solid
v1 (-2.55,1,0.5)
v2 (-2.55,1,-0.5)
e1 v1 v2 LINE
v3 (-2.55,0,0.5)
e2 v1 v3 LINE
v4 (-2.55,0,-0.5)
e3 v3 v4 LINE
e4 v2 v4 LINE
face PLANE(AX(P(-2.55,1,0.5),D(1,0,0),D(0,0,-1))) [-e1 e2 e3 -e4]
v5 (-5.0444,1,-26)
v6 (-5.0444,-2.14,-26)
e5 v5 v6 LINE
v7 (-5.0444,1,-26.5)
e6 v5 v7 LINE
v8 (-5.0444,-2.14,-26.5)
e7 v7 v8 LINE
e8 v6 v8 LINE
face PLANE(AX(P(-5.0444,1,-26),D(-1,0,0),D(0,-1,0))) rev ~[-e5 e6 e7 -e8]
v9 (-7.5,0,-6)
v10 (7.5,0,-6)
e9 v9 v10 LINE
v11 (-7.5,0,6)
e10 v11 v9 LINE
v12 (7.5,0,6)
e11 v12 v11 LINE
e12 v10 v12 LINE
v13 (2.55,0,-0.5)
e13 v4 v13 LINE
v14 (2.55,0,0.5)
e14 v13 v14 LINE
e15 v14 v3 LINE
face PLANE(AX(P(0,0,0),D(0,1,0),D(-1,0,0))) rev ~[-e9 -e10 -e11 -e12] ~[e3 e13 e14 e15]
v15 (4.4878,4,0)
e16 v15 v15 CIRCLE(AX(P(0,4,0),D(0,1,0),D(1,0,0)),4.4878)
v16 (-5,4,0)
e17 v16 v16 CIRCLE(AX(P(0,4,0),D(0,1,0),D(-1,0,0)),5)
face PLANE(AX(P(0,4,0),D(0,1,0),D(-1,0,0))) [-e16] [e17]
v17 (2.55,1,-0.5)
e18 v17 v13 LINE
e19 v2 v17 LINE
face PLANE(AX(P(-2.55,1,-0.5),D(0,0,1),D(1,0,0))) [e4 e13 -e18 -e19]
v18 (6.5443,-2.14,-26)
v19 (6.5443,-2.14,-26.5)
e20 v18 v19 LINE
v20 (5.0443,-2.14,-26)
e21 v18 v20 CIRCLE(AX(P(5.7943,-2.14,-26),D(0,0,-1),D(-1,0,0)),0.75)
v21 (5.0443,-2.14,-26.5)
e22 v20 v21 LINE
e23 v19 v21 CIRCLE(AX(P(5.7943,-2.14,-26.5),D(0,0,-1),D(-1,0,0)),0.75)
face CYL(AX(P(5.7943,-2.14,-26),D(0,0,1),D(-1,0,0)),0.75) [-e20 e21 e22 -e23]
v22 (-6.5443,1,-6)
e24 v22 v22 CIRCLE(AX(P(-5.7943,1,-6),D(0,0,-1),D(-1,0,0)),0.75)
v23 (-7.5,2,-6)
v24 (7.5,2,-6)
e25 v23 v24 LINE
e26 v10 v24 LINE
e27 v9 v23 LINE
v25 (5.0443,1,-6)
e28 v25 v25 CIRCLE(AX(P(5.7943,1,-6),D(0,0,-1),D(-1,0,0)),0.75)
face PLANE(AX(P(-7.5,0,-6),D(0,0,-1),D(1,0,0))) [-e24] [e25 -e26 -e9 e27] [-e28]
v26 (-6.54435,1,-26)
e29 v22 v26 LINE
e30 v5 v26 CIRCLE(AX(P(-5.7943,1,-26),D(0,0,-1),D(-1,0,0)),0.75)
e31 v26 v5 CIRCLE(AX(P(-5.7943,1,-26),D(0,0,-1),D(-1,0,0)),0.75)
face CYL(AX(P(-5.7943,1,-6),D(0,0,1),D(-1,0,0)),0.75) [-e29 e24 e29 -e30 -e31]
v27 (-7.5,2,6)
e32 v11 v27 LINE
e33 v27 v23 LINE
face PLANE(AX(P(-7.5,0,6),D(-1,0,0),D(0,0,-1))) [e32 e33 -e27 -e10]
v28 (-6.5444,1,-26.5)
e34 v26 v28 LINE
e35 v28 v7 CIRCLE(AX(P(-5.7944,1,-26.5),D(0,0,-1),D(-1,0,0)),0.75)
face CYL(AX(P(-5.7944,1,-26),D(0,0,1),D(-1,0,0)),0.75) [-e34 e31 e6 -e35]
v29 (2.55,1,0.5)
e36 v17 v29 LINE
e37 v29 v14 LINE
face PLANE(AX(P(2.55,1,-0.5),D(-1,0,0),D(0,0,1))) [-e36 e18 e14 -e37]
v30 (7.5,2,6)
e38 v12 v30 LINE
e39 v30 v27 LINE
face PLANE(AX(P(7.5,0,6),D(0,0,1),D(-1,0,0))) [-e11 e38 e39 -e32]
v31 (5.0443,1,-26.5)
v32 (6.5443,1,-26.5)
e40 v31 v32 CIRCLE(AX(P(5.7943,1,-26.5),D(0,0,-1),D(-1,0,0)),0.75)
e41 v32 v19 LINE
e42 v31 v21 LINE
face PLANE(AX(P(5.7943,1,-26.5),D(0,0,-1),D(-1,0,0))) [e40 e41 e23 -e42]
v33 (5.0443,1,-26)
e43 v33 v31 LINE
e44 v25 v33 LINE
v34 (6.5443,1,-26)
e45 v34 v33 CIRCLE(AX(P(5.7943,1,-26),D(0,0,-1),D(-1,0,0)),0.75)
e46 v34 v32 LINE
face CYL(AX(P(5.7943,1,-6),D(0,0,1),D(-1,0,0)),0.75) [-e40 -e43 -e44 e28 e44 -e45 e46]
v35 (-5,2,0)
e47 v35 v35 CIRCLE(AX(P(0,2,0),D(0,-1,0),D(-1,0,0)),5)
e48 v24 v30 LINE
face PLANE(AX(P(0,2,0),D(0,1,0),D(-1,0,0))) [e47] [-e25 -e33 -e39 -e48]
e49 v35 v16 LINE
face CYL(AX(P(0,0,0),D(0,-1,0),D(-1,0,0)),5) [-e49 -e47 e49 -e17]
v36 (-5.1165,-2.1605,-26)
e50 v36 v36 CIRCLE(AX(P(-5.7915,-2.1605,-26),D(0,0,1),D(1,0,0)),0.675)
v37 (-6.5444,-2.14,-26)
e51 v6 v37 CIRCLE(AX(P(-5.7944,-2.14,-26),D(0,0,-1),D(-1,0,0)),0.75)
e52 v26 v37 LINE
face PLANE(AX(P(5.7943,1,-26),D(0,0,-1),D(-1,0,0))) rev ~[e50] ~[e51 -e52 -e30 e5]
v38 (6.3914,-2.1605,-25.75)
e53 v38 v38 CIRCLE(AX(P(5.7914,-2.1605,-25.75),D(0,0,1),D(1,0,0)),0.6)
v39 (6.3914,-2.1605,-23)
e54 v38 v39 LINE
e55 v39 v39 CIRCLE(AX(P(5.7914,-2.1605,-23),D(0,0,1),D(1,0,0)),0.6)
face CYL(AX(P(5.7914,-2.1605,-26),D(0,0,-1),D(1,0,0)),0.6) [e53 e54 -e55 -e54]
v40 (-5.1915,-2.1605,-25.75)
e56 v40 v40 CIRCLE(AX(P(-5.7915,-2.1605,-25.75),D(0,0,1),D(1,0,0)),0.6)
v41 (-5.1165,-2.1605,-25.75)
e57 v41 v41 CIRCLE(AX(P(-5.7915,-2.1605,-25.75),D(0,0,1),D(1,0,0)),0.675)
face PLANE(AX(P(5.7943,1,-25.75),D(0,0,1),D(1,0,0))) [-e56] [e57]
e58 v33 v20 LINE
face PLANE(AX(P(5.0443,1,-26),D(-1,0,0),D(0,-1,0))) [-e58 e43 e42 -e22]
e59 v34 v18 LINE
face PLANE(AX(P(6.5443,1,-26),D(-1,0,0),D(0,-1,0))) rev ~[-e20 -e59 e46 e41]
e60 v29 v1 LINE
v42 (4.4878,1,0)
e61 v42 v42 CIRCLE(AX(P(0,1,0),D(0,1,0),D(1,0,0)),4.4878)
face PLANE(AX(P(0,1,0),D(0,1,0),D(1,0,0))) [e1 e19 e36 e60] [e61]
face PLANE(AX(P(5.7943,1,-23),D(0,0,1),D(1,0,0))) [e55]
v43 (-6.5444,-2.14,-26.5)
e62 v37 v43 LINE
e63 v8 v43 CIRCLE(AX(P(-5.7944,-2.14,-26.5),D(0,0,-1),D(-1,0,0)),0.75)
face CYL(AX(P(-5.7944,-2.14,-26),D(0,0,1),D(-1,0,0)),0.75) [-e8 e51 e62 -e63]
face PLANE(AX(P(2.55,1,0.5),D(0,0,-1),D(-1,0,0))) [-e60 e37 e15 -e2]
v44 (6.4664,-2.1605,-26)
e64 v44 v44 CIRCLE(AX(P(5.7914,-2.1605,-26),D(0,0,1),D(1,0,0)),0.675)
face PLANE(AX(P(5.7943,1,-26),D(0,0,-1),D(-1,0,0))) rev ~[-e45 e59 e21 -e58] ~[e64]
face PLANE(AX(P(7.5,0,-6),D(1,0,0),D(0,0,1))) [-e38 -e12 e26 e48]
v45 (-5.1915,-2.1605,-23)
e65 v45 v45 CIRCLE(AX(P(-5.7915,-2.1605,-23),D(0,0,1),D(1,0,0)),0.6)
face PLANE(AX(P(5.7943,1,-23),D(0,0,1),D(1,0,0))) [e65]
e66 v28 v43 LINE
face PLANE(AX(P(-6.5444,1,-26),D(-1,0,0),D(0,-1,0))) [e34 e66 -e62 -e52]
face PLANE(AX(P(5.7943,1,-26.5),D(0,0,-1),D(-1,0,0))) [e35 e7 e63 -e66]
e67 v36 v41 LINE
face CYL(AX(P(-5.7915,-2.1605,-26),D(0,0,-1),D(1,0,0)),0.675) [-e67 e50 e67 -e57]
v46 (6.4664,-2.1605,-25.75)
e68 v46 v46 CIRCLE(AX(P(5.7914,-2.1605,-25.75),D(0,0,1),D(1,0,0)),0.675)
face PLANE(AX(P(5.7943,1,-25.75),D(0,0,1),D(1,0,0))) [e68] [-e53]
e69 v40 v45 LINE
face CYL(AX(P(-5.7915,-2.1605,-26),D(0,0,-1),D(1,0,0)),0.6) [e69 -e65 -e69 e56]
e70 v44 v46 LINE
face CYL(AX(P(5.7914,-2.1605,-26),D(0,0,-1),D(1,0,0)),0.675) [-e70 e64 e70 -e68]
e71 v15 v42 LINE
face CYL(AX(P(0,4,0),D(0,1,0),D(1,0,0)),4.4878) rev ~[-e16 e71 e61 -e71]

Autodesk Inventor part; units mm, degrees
ref_plane "YZ Plane" through (0, 0, 0) normal (1, 0, 0) x (0, 1, 0)
ref_plane "XZ Plane" through (0, 0, 0) normal (0, 1, 0) x (-1, 0, 0)
ref_plane "XY Plane" through (0, 0, 0) normal (0, 0, 1) x (1, 0, 0)
sketch "Sketch1" plane through (0, 0, 0) normal (0, 1, 0) x (-1, 0, 0)
  line L0 (2.55, 0.5) -> (-2.55, 0.5)
  line L1 (-2.55, 0.5) -> (-2.55, -0.5)
  line L2 (-2.55, -0.5) -> (2.55, -0.5)
  line L3 (2.55, -0.5) -> (2.55, 0.5)
  line L4 (-2.55, 0) -> (2.55, 0) construction
  point P0 (0, 0)
  point P1 (0, -0.5)
  point P2 (0, 0)
  dimension "d0" = 5.1
  dimension "d1" = 1
sketch "Sketch2" plane through (0, 0, 0) normal (0, 1, 0) x (-1, 0, 0)
  circle A0 centre (0, 0) radius 5
  dimension "d4" = 10
sketch "Sketch3" plane through (0, 0, 0) normal (0, 1, 0) x (-1, 0, 0)
  line L0 (7.5, -6) -> (-7.5, -6)
  line L1 (-7.5, -6) -> (-7.5, 6)
  line L2 (-7.5, 6) -> (7.5, 6)
  line L3 (7.5, 6) -> (7.5, -6)
  line L4 (7.5, 0) -> (-7.5, 0) construction
  line L5 (0, -6) -> (0, 6) construction
  point P0 (0, 0)
  point P1 (0, 0)
  dimension "d2" = 15
  dimension "d3" = 12
extrude "Extrusion1" add sketch "Sketch3" along normal blind 2
extrude "Extrusion2" cut sketch "Sketch1" along normal blind 2
extrude "Extrusion4" add sketch "Sketch2" along normal blind 4
sketch "Sketch7" plane through (0, 4, 0) normal (0, 1, 0) x (1, 0, 0)
  circle A0 centre (0, 0) radius 4.4878
extrude "Extrusion5" cut sketch "Sketch7" against normal blind 3
sketch "Sketch8" plane through (0, 1, 0) normal (0, 1, 0) x (1, 0, 0)
  line L0 (-2.55, 0.5) -> (2.55, 0.5)
  line L1 (2.55, 0.5) -> (2.55, -0.5)
  line L2 (2.55, -0.5) -> (-2.55, -0.5)
  line L3 (-2.55, -0.5) -> (-2.55, 0.5)
  line L4 (-2.55, 0) -> (2.55, 0) construction
  line L5 (0, 0.5) -> (0, -0.5) construction
  point P0 (0, 0)
  point P1 (0, 0)
  dimension "d15" = 5.1
  dimension "d16" = 1
extrude "Extrusion6" cut sketch "Sketch8" against normal blind 3
sketch "Sketch9" plane through (7.5, 0, -6) normal (0, 0, -1) x (-1, 0, 0)
  circle A0 centre (13.2943, 1) radius 0.75
  line L0 (7.5, 0) -> (7.5, 2) construction
  line L1 (2.5, 2) -> (12.5, 2) construction
  circle A1 centre (1.7057, 1) radius 0.75
  dimension "d19" = 1.5
extrude "Extrusion7" add sketch "Sketch9" along normal blind 20
sketch "Sketch14" plane through (5.7943, 1, -26) normal (0, 0, -1) x (-1, 0, 0)
  circle A0 centre (0, -3.14) radius 0.75
  circle A1 centre (11.5887, -3.14) radius 0.75
  circle A2 centre (11.5887, 0) radius 0.75 projected
  line L0 (10.8387, 0) -> (10.8387, -3.14)
  line L1 (12.3387, 0) -> (12.3387, -3.14)
  circle A3 centre (0, 0) radius 0.75 projected
  line L2 (-0.75, 0) -> (-0.75, -3.14)
  line L3 (0.75, 0) -> (0.75, -3.14)
  point P0 (5.7943, -1)
  dimension "d25" = 1.5
  dimension "d26" = 1.5
extrude "Extrusion8" add sketch "Sketch14" along normal blind 0.5
sketch "Sketch17" plane through (5.7943, 1, -26) normal (0, 0, 1) x (1, 0, 0)
  line L0 (-13.2943, -1) -> (1.7057, -1) construction
  line L1 (-0.0029, -1) -> (-0.0029, -3.1605) construction
  circle A0 centre (-0.0029, -3.1605) radius 0.6 construction
  line L2 (-5.7943, -1) -> (-5.7943, -3.1605) construction
  circle A1 centre (-0.0029, -3.1605) radius 0.6
  circle A2 centre (-11.5858, -3.1605) radius 0.6 construction
  circle A3 centre (-11.5858, -3.1605) radius 0.6
  circle A4 centre (-0.0029, -3.1605) radius 0.675
  circle A5 centre (-11.5858, -3.1605) radius 0.675
  dimension "d29" = 1.2
  dimension "d32" = 1.35
  dimension "d33" = 1.35
extrude "Extrusion9" add sketch "Sketch17" along normal blind 3 contours A1 | A3
sketch "Sketch19" plane through (5.7943, 1, -26) normal (0, 0, 1) x (1, 0, 0)
  circle A0 centre (-11.5858, -3.1605) radius 0.6 projected
  circle A1 centre (-11.5858, -3.1605) radius 0.675
  circle A2 centre (-0.0029, -3.1605) radius 0.6 projected
  circle A3 centre (-0.0029, -3.1605) radius 0.675
  point P0 (-5.7943, -1)
  dimension "d34" = 1.35
  dimension "d35" = 1.35
extrude "Extrusion10" add sketch "Sketch19" along normal blind 0.25
properties part number "LDR_case"
